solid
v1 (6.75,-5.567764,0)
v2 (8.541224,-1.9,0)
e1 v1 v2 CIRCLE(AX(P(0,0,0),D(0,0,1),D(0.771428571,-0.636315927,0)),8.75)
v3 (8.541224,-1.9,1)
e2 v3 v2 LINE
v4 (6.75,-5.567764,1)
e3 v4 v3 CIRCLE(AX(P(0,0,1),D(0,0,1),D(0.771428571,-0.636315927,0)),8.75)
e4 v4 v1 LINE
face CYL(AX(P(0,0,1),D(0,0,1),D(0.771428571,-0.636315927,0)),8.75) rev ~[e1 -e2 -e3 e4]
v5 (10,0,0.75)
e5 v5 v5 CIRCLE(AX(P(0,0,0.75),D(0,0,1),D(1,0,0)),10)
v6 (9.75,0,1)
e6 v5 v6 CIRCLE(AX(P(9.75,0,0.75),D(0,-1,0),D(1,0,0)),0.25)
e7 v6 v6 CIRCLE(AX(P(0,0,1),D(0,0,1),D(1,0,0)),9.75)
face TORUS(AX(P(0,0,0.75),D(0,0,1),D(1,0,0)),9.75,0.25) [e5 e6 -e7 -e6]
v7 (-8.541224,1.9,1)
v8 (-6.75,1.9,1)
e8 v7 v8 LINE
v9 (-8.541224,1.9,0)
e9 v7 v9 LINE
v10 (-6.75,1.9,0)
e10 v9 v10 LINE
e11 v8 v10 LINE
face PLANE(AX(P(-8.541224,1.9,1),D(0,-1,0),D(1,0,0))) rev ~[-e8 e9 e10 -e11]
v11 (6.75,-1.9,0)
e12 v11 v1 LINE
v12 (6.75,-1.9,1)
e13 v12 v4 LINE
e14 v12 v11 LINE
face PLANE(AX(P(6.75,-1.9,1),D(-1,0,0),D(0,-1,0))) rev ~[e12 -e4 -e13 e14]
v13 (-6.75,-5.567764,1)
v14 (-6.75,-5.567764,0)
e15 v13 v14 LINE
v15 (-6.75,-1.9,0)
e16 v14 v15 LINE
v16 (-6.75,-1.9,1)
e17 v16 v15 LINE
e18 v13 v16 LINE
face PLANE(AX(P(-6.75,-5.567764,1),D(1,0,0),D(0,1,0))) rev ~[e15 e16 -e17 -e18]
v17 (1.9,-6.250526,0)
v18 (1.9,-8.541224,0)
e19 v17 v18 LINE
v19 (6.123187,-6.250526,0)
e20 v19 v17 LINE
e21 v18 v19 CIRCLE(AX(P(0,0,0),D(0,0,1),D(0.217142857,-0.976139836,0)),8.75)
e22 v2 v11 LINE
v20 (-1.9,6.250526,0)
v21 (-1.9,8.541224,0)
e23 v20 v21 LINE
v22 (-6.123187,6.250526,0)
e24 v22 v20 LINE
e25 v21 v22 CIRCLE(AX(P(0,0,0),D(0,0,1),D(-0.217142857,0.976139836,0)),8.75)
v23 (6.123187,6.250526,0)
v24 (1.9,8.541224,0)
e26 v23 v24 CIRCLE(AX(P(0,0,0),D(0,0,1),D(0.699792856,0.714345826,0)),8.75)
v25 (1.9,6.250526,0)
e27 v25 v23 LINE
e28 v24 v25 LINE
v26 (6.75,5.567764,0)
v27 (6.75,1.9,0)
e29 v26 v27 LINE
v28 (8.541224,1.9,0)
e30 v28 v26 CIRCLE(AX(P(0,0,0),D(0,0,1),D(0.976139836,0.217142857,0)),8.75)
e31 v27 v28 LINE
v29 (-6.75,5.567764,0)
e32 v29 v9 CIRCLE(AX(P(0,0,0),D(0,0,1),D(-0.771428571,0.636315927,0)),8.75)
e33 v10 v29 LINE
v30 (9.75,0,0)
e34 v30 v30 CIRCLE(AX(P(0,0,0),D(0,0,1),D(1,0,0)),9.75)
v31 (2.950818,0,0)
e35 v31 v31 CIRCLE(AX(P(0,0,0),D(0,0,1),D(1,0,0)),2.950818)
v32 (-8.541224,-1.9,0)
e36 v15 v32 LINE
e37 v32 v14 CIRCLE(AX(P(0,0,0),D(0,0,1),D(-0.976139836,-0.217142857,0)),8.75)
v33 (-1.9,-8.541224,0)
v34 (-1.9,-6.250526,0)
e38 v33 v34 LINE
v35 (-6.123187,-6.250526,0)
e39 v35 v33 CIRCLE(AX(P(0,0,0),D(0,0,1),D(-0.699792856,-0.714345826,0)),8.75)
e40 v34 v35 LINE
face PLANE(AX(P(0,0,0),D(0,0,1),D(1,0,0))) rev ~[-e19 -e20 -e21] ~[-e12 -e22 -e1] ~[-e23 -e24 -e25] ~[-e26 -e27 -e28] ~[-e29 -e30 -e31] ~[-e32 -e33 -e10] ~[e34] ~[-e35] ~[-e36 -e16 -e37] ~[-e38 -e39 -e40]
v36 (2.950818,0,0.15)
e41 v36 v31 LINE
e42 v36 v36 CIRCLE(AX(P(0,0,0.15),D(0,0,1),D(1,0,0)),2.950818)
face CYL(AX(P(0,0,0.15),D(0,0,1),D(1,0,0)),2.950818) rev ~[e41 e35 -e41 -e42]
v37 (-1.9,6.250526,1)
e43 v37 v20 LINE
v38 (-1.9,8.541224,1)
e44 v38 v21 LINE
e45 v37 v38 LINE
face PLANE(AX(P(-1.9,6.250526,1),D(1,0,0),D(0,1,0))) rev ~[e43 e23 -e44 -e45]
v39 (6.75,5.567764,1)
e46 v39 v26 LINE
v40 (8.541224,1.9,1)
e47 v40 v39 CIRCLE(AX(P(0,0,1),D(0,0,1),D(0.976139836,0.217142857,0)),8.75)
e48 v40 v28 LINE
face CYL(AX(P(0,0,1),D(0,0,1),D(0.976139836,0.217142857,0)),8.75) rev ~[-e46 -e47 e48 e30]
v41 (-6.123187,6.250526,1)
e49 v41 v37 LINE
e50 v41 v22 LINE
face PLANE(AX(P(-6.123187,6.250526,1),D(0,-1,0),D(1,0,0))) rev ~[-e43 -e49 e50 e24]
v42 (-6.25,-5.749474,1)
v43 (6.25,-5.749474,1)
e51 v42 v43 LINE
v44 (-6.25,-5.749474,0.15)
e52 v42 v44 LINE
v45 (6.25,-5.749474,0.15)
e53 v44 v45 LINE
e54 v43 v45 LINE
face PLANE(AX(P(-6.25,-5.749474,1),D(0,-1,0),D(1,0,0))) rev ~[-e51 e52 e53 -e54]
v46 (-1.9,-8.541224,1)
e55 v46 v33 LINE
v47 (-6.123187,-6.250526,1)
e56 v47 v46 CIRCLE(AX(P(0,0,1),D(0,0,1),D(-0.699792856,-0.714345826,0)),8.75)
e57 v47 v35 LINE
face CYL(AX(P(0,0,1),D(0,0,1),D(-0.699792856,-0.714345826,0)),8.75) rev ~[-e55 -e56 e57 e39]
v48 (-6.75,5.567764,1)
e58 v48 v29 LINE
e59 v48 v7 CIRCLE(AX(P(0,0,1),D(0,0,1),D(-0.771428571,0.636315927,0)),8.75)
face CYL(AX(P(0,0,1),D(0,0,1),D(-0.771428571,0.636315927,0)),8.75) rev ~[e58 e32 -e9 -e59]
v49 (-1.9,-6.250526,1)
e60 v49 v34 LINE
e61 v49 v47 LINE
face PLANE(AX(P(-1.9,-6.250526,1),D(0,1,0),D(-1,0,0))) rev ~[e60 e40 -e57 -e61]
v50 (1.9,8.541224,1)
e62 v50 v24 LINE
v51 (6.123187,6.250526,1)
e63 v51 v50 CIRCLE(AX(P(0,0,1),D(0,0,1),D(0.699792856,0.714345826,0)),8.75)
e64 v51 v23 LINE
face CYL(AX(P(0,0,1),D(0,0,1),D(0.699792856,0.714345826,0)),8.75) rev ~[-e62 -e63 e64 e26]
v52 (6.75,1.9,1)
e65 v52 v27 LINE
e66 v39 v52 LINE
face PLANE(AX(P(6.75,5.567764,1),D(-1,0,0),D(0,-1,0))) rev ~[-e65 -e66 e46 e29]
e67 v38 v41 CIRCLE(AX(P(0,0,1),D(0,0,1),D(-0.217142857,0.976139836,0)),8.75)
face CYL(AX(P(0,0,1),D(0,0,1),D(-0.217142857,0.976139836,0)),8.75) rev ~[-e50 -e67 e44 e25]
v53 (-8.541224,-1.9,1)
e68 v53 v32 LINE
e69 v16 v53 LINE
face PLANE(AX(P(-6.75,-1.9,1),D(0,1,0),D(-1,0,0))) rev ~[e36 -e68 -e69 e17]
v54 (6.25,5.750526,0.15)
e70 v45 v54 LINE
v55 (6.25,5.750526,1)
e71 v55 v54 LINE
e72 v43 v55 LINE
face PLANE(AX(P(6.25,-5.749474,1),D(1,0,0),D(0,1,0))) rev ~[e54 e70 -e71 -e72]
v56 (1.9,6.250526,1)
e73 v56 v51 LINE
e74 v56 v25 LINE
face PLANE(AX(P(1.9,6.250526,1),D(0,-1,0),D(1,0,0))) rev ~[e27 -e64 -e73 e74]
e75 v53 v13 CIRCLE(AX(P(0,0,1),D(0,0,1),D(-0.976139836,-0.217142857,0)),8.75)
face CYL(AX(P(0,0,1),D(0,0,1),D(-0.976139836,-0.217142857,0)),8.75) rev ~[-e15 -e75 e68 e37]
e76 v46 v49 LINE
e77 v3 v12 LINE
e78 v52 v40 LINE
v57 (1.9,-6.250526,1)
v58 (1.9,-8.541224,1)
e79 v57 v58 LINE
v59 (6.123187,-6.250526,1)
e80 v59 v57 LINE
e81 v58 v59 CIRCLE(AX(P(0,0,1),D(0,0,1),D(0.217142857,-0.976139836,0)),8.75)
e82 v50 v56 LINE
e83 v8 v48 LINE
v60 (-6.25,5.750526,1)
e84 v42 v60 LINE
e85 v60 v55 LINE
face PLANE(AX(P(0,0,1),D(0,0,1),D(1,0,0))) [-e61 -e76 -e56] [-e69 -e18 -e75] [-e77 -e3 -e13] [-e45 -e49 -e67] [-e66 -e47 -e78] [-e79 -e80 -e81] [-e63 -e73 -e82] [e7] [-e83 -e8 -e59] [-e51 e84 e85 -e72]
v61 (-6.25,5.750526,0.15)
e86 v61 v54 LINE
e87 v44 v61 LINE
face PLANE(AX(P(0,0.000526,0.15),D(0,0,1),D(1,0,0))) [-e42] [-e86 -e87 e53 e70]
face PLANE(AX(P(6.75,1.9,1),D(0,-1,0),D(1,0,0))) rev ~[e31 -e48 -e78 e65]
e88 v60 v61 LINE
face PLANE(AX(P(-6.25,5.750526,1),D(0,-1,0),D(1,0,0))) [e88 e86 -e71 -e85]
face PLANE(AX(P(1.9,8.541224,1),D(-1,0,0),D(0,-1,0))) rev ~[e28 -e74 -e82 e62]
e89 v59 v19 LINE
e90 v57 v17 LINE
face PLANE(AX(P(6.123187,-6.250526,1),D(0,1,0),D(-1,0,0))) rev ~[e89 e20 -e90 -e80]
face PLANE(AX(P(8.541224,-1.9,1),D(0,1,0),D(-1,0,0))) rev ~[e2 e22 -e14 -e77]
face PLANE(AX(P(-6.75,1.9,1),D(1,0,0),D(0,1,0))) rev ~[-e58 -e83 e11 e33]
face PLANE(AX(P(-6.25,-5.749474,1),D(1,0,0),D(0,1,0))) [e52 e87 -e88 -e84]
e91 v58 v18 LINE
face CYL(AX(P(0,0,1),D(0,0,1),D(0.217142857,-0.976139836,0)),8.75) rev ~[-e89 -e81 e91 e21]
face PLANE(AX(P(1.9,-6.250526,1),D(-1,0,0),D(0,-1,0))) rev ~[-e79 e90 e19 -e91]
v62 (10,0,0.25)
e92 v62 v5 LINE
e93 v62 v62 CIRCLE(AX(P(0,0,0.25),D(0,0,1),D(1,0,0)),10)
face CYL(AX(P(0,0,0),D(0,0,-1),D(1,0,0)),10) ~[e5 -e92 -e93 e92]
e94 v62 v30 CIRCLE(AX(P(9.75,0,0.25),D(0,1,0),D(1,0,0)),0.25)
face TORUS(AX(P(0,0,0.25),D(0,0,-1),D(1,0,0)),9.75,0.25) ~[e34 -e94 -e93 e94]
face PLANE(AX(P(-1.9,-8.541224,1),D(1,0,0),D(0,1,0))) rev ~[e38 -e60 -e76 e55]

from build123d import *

# Parameters (mm, degrees)
F0_R     = 10
F1_DEPTH = 1
F2_W     = 12.5
F2_H     = 11.5
F3_DEPTH = 0.85
F5_R     = 2.9508175635
F6_DEPTH = 0.15
F7_R     = 0.25
F9_DEPTH = 1


# Not quite as in the source:
# - a feature names something its author has since deleted; it is built from what else it names


with BuildPart() as f1:
    # F0 (on Top) → F1 (new body)
    with BuildSketch(Plane.XY):
        Circle(F0_R)
    extrude(amount=F1_DEPTH)

    # F2 (on face) → F3 (cut)
    with BuildSketch(Plane.XY.offset(1)):
        with Locations((0, 0.0005259759)):
            Rectangle(F2_W, F2_H)
    extrude(amount=-F3_DEPTH, mode=Mode.SUBTRACT)

    # F5 (on offset) → F6 (cut)
    with BuildSketch(Plane.XY.offset(0.15)):
        Circle(F5_R)
    extrude(amount=-F6_DEPTH, mode=Mode.SUBTRACT)

    # F7
    f7_edges = [f1.edges().sort_by_distance(p)[0] for p in [
        (-10, 0, 1),
        (-10, 0, 0),
    ]]
    fillet(f7_edges, radius=F7_R)

    # F8 (on face) → F9 (cut, through all)
    with BuildSketch(Plane.XY.offset(1)):
        with BuildLine():
            Line((1.9, 8.5412235657), (1.9, 6.2505259759))
            Line((1.9, 6.2505259759), (6.1231874889, 6.2505259759))
            ThreePointArc((6.1231874889, 6.2505259759), (4.1718950409, 7.6914102587), (1.9, 8.5412235657))
        make_face()
        with BuildLine():
            Line((-6.75, 1.9), (-6.75, 5.5677643628))
            ThreePointArc((-6.75, 5.5677643628), (-7.8624743809, 3.8397912196), (-8.5412235657, 1.9))
            Line((-8.5412235657, 1.9), (-6.75, 1.9))
        make_face()
        with BuildLine():
            Line((-6.75, -5.5677643628), (-6.75, -1.9))
            Line((-6.75, -1.9), (-8.5412235657, -1.9))
            ThreePointArc((-8.5412235657, -1.9), (-7.8624743809, -3.8397912196), (-6.75, -5.5677643628))
        make_face()
        with BuildLine():
            Line((-1.9, -6.2505259759), (-6.1231874889, -6.2505259759))
            ThreePointArc((-6.1231874889, -6.2505259759), (-4.1718950409, -7.6914102587), (-1.9, -8.5412235657))
            Line((-1.9, -8.5412235657), (-1.9, -6.2505259759))
        make_face()
        with BuildLine():
            ThreePointArc((1.9, -8.5412235657), (4.1718950409, -7.6914102587), (6.1231874889, -6.2505259759))
            Line((6.1231874889, -6.2505259759), (1.9, -6.2505259759))
            Line((1.9, -6.2505259759), (1.9, -8.5412235657))
        make_face()
        with BuildLine():
            Line((8.5412235657, -1.9), (6.75, -1.9))
            Line((6.75, -1.9), (6.75, -5.5677643628))
            ThreePointArc((6.75, -5.5677643628), (7.8624743809, -3.8397912196), (8.5412235657, -1.9))
        make_face()
        with BuildLine():
            ThreePointArc((8.5412235657, 1.9), (7.8624743809, 3.8397912196), (6.75, 5.5677643628))
            Line((6.75, 5.5677643628), (6.75, 1.9))
            Line((6.75, 1.9), (8.5412235657, 1.9))
        make_face()
        with BuildLine():
            Line((-6.1231874889, 6.2505259759), (-1.9, 6.2505259759))
            Line((-1.9, 6.2505259759), (-1.9, 8.5412235657))
            ThreePointArc((-1.9, 8.5412235657), (-4.1718950409, 7.6914102587), (-6.1231874889, 6.2505259759))
        make_face()
    extrude(amount=-F9_DEPTH, mode=Mode.SUBTRACT)


solid = f1.part
